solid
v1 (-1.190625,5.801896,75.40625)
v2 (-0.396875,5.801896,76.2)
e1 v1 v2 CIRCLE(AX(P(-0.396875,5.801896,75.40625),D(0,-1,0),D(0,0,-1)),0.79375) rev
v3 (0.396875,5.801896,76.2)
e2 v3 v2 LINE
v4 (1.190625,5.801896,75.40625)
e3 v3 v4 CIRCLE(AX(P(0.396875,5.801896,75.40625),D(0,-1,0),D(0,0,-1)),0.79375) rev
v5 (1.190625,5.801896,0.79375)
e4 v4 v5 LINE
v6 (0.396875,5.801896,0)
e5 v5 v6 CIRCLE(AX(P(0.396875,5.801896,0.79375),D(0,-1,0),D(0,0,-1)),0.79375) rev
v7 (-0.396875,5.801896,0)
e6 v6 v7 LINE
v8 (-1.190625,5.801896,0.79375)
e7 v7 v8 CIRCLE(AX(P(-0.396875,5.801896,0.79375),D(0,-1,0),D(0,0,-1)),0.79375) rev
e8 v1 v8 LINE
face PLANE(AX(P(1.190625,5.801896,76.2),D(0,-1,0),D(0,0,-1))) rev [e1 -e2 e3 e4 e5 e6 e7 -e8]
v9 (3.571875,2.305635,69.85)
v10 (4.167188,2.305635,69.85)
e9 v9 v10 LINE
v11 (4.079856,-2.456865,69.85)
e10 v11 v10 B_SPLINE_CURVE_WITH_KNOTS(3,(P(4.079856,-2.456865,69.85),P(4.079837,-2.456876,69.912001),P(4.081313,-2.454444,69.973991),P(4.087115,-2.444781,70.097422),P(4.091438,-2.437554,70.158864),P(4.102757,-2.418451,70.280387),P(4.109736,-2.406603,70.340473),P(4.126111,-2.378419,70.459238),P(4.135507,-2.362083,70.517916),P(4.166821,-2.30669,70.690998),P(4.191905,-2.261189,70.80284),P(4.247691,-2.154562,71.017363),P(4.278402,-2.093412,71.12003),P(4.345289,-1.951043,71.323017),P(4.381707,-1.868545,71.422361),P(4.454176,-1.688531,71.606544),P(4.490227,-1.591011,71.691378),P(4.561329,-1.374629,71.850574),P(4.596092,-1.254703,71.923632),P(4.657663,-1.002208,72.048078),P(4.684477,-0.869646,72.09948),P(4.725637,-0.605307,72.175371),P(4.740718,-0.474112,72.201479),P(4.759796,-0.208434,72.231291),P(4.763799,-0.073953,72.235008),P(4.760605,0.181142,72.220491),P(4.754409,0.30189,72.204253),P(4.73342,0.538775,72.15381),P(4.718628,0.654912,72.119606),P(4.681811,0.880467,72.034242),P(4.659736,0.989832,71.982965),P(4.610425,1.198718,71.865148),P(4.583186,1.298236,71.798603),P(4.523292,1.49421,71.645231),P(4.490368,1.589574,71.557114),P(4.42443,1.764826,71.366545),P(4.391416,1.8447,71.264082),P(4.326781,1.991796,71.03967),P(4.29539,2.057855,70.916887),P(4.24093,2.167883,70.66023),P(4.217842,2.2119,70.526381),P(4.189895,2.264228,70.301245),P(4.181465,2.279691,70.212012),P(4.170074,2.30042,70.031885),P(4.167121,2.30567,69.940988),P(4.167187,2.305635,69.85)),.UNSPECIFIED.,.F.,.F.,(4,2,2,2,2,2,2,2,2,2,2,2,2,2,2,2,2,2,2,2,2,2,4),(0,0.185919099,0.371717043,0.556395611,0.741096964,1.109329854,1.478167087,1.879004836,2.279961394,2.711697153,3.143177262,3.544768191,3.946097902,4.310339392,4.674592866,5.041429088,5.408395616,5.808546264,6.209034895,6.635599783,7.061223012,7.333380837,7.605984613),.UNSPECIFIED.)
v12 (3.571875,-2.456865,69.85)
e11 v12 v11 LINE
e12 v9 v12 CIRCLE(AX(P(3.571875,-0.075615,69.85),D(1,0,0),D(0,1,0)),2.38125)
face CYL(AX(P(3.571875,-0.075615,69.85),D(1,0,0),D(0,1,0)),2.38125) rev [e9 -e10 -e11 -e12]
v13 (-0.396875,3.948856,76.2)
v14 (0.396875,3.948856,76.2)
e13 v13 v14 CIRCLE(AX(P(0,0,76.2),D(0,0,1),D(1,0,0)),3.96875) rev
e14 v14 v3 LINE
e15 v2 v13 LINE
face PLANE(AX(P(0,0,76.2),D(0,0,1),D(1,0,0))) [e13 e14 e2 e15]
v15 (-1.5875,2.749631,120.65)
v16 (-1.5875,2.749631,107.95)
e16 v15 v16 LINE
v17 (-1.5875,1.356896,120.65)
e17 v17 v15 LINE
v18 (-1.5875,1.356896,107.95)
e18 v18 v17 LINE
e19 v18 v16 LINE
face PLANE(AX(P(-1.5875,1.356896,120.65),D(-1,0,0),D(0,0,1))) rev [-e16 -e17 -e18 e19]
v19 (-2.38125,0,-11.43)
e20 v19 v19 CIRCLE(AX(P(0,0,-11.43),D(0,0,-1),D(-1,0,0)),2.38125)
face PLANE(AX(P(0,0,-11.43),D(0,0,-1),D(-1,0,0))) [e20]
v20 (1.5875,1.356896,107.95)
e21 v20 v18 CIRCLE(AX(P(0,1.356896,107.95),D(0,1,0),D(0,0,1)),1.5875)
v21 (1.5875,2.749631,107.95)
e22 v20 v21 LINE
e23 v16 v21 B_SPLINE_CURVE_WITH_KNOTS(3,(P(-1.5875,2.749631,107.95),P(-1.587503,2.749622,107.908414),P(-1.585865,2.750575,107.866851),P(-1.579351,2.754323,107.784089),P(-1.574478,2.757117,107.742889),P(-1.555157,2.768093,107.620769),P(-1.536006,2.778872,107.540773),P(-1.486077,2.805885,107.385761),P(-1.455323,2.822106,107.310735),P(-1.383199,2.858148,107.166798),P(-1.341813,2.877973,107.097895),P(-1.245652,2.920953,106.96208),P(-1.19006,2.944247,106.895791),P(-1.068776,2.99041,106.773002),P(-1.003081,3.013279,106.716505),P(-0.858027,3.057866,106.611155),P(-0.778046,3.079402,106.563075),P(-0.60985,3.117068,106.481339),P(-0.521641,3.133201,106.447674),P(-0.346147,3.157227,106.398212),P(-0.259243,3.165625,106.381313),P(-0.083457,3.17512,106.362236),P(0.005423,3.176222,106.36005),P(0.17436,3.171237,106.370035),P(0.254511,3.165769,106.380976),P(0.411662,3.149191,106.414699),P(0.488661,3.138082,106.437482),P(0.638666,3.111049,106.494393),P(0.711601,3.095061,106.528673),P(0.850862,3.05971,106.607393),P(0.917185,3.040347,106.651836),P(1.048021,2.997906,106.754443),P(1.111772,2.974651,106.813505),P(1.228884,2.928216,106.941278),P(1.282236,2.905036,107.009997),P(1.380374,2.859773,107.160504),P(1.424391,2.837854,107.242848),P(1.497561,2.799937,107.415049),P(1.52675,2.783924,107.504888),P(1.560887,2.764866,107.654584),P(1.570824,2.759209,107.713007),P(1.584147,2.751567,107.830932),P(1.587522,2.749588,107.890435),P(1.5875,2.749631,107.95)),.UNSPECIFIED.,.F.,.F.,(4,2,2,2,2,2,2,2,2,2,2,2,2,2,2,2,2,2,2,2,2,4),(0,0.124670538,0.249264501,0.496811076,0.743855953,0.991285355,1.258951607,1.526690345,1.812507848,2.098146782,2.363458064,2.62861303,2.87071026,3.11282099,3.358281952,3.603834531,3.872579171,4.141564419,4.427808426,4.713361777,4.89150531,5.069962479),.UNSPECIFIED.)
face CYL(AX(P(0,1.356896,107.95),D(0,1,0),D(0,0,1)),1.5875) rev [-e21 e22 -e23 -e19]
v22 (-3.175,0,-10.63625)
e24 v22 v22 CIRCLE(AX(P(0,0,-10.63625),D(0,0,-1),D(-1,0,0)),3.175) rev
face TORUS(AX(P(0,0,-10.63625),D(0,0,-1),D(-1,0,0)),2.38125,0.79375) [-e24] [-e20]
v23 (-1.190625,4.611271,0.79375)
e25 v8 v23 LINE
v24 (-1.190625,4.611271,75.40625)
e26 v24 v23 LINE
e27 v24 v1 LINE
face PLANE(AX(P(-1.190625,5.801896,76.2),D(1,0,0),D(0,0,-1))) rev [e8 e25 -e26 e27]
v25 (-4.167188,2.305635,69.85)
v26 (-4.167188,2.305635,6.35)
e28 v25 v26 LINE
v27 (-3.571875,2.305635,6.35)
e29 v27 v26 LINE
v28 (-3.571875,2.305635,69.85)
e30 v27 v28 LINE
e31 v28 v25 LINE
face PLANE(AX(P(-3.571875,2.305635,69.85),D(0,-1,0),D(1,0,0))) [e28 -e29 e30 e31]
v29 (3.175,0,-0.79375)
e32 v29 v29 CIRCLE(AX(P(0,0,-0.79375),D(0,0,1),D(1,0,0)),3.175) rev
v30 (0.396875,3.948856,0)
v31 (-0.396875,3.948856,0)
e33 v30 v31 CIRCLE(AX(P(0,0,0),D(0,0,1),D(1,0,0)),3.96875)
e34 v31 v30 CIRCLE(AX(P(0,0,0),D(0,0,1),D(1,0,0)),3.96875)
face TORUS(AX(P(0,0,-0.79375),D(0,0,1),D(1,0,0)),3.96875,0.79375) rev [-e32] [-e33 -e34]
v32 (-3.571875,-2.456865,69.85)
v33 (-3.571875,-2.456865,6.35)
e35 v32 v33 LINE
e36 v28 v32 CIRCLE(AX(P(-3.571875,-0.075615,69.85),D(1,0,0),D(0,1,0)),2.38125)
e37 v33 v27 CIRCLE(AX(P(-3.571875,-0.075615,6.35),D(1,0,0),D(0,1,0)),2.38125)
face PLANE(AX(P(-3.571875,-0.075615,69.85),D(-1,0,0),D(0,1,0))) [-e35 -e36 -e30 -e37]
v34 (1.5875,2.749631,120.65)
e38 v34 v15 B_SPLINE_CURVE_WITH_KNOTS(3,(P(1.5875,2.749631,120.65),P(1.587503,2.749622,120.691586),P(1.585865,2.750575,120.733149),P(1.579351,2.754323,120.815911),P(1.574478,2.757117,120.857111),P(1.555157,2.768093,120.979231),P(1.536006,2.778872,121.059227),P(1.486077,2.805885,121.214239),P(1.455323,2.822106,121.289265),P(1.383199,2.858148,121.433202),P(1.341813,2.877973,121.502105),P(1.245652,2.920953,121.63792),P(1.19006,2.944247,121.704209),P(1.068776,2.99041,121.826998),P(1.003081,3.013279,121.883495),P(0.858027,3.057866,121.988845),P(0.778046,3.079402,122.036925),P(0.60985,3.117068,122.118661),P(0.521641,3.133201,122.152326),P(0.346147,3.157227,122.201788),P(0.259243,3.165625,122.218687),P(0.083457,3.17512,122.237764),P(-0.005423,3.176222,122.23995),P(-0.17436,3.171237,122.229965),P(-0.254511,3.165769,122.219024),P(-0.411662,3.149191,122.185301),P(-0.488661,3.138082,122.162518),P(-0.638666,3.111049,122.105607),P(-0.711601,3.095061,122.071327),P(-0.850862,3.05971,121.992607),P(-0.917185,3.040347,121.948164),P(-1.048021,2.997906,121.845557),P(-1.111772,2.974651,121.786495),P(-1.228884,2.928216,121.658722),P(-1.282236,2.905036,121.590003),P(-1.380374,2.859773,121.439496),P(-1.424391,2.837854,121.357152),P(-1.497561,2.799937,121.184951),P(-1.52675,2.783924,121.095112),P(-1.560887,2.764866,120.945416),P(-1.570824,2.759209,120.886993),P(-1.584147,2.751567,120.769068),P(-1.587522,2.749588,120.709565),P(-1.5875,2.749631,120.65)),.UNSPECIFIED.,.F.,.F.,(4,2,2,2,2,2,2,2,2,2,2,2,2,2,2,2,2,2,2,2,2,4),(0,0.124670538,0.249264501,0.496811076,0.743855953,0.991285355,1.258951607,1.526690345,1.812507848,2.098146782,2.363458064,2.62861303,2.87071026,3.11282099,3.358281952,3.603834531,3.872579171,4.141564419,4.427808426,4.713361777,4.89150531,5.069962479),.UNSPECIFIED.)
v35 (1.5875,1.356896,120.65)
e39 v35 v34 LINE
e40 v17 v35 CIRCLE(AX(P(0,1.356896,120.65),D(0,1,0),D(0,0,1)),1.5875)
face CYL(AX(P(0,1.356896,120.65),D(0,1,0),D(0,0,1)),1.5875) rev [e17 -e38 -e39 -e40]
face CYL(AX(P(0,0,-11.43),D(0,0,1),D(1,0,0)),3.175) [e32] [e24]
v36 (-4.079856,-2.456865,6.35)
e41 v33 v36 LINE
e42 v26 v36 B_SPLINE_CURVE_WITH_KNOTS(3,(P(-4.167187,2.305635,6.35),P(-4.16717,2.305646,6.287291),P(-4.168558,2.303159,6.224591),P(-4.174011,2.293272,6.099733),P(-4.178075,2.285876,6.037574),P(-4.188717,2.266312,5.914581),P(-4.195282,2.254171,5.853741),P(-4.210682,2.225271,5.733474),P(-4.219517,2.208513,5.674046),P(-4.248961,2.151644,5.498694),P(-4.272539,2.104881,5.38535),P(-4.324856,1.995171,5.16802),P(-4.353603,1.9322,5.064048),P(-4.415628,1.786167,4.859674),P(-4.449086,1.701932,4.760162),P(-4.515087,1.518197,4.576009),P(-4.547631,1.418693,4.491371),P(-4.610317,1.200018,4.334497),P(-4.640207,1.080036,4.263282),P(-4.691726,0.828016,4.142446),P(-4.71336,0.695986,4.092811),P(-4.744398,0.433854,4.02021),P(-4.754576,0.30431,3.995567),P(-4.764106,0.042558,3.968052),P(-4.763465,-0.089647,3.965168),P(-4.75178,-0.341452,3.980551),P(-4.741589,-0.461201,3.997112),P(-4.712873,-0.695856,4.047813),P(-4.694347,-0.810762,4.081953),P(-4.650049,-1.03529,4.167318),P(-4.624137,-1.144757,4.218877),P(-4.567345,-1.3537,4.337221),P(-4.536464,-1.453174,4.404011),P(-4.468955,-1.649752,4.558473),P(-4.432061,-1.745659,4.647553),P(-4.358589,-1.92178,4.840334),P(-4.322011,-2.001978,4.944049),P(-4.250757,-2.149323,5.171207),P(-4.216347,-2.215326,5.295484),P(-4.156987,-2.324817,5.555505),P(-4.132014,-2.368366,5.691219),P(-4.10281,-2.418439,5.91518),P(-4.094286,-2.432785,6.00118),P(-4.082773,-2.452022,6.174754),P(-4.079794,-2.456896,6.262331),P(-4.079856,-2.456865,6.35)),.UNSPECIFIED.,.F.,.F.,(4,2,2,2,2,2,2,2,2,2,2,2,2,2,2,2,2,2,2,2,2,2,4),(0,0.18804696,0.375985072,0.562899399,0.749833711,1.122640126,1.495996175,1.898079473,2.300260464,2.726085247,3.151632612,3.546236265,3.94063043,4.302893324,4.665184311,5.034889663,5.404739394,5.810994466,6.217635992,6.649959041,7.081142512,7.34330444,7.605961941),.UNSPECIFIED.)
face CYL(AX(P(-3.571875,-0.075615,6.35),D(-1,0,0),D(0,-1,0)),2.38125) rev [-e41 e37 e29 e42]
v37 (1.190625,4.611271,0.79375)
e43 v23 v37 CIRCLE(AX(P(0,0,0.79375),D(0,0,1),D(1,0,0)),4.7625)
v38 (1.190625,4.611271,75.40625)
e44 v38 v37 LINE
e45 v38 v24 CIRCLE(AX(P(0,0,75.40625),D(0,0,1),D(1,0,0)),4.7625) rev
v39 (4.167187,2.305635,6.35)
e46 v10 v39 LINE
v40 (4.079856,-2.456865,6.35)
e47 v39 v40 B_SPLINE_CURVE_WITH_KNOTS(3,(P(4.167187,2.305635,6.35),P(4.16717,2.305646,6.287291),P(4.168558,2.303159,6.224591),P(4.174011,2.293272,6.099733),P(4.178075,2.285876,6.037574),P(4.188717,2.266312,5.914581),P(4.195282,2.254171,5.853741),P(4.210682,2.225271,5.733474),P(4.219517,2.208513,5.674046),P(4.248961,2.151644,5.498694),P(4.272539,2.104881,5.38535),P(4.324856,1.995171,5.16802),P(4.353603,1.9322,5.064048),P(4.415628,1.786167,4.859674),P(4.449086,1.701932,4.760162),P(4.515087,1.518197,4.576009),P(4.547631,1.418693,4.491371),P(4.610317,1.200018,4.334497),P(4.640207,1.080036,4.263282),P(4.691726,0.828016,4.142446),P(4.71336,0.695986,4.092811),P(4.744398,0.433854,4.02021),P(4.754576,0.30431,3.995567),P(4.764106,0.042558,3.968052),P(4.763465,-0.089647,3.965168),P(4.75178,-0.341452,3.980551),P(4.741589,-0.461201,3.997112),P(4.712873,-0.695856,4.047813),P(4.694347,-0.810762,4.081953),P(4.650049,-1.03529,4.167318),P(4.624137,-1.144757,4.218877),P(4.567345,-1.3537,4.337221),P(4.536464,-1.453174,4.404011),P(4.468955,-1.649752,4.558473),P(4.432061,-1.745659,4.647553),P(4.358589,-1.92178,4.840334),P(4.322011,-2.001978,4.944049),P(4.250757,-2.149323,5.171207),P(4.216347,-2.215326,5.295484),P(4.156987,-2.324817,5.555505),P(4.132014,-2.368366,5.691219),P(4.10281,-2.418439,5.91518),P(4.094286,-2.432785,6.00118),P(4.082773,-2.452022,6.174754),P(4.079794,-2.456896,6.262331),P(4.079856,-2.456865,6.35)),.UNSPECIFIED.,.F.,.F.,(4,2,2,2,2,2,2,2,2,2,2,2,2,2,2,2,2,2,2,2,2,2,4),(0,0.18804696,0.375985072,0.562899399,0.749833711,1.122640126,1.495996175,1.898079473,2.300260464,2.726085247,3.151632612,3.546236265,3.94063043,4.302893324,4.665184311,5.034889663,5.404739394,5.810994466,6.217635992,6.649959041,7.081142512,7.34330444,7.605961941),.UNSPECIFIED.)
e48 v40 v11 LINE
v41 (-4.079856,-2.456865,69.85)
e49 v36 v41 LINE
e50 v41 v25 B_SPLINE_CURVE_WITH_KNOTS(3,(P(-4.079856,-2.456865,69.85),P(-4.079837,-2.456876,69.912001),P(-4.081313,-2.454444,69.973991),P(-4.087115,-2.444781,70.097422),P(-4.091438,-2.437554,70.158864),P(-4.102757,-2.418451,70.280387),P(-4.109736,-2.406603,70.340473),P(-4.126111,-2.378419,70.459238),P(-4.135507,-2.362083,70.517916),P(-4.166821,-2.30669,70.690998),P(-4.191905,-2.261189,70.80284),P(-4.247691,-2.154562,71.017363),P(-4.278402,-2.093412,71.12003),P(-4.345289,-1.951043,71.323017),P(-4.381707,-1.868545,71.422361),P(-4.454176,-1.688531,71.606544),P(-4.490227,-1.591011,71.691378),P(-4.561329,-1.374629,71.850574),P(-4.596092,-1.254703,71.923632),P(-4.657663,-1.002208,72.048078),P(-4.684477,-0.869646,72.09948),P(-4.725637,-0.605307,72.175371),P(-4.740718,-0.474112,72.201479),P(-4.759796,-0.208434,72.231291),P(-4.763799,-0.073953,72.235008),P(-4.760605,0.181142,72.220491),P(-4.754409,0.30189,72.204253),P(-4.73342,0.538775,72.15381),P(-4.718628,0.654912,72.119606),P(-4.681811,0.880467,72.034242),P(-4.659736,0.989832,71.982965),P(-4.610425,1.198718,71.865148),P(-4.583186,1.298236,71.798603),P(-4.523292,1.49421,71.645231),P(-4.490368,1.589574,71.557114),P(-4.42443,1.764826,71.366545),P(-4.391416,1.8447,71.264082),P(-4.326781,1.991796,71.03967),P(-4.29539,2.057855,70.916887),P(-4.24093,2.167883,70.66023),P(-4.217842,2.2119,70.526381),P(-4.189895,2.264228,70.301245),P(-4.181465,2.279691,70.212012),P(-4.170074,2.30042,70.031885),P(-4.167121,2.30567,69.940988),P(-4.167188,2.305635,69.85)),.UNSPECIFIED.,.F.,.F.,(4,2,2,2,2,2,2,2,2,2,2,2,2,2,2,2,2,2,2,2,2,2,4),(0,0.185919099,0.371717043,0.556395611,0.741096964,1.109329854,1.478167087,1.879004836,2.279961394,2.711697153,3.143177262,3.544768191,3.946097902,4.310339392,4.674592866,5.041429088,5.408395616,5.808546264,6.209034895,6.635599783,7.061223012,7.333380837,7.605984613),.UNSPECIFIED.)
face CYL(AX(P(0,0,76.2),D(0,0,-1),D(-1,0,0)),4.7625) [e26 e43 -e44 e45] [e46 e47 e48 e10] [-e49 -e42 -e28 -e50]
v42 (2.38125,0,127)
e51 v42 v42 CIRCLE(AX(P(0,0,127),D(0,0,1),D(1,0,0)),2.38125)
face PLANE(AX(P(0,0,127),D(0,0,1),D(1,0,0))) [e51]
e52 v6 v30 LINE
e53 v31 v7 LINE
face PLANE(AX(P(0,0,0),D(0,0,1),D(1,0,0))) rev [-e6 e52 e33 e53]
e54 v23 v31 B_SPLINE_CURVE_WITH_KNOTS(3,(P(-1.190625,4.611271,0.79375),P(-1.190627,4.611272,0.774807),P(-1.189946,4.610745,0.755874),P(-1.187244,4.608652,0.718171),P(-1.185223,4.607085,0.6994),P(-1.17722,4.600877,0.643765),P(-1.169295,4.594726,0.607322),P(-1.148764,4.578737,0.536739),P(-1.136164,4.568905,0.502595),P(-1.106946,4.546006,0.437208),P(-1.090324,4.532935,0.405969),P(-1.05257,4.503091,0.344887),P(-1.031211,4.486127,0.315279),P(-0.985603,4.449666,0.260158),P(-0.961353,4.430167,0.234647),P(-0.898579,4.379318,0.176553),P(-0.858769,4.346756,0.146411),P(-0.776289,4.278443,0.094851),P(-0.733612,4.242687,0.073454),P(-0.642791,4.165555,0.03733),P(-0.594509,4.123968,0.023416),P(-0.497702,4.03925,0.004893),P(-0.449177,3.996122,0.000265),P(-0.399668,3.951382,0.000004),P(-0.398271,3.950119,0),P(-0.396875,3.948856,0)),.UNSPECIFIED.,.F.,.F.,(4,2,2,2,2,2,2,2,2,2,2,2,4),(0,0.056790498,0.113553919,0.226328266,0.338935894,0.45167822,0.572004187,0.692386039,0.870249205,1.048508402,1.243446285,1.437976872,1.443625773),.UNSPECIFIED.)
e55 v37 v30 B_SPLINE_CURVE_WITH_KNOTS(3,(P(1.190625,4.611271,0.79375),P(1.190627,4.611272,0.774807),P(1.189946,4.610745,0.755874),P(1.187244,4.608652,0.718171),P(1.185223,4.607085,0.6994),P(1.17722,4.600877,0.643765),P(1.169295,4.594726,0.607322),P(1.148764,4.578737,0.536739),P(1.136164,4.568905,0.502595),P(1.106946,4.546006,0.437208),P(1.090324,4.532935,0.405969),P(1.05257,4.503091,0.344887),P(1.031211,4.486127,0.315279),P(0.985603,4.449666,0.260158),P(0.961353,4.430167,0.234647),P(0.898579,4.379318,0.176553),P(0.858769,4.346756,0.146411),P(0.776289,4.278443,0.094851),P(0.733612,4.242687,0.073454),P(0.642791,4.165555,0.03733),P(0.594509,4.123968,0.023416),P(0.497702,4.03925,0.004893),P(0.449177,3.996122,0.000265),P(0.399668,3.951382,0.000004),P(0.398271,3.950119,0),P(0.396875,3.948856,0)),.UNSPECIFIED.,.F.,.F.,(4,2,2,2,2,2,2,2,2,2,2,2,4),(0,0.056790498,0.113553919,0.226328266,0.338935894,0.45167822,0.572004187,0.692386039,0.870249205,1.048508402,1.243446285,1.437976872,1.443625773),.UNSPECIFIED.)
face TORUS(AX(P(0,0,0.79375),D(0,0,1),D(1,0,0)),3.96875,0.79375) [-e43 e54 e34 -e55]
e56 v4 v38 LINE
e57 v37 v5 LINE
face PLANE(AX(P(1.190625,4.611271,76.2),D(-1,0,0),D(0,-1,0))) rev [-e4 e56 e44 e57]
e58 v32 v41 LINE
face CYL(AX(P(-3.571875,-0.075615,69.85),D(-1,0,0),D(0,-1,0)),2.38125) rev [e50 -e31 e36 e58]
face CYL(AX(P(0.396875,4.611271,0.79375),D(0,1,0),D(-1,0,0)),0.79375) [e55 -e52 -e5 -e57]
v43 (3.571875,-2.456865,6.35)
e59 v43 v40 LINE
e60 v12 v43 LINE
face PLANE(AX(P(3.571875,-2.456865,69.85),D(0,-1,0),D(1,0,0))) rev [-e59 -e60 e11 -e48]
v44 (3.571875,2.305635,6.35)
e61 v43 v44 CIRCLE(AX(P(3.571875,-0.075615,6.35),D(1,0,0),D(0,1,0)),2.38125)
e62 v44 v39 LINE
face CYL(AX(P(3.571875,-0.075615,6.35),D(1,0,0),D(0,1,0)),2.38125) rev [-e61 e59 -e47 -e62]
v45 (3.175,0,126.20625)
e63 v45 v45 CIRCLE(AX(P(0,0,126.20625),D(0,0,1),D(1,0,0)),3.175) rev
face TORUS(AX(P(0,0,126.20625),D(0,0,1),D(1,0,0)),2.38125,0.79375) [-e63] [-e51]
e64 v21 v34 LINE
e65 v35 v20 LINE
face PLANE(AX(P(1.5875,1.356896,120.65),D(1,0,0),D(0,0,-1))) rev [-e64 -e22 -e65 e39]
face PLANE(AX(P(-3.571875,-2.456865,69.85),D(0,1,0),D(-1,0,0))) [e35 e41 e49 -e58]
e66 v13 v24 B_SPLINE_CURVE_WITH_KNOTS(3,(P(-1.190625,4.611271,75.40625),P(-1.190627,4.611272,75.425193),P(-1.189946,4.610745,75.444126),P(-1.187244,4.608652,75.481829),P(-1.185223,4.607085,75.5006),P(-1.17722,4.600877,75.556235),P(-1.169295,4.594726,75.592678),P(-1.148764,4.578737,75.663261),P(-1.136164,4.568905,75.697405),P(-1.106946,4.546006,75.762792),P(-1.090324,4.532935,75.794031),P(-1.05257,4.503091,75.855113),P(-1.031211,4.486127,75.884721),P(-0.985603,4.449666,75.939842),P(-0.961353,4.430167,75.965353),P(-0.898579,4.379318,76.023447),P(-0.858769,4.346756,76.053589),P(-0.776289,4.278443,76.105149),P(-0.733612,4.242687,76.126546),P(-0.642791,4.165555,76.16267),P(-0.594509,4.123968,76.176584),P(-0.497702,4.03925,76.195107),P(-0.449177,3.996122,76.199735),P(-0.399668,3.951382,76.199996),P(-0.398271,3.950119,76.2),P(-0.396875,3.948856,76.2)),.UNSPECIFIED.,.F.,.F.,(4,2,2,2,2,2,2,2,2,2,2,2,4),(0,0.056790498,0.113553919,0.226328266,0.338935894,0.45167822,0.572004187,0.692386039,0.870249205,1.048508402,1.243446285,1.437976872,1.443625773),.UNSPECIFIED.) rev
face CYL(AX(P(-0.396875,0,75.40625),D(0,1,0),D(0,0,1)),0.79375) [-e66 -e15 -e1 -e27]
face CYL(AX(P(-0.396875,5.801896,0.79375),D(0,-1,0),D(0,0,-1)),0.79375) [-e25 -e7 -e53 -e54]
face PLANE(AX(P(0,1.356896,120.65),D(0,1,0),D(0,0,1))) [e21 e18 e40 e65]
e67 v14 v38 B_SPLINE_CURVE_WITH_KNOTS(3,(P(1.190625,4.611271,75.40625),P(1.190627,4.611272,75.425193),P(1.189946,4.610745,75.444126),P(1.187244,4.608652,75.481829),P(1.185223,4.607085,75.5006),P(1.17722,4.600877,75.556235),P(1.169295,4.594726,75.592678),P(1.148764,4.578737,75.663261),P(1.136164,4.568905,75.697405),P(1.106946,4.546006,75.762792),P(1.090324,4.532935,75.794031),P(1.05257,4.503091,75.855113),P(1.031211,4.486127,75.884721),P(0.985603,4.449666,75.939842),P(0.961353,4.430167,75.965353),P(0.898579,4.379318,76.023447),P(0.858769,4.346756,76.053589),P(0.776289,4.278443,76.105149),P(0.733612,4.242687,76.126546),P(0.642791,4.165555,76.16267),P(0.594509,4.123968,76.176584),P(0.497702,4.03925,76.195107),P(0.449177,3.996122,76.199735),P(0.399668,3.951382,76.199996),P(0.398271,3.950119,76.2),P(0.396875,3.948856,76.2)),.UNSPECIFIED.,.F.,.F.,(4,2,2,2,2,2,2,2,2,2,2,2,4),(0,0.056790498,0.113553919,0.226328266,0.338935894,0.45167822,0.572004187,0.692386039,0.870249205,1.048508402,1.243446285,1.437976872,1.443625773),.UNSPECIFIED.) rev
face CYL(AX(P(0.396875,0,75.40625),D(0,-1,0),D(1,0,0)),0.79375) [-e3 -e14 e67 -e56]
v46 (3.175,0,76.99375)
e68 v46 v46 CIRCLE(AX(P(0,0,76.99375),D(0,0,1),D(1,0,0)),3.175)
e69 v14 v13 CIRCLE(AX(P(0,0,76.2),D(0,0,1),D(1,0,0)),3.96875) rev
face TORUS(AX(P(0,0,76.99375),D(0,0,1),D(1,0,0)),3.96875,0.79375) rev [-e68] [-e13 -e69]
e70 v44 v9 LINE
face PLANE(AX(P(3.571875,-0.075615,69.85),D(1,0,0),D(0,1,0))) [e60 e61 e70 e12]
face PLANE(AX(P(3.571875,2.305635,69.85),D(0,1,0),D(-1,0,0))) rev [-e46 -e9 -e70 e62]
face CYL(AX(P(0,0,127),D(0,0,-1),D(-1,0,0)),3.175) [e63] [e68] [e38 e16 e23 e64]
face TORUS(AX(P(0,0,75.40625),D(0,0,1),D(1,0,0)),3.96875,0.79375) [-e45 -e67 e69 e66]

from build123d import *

# Parameters (mm, degrees)
BOSS_EXTRUDE1_DEPTH = 76.2
SKETCH2_R           = 3.175
BOSS_EXTRUDE2_DEPTH = 11.43
BOSS_EXTRUDE3_START = 50.8
SKETCH3_R           = 3.175
BOSS_EXTRUDE3_DEPTH = 50.8
FILLET1_R           = 0.79375
CUT_EXTRUDE1_DEPTH  = 1.190625
CUT_EXTRUDE2_DEPTH  = 4.445


with BuildPart() as part:
    # Sketch1 → Boss-Extrude1 (new body)
    with BuildSketch(Plane.XY):
        with BuildLine():
            Line((1.190625, 4.611270797), (1.190625, 5.801895797))
            Line((1.190625, 5.801895797), (-1.190625, 5.801895797))
            Line((-1.190625, 5.801895797), (-1.190625, 4.611270797))
            ThreePointArc((-1.190625, 4.611270797), (0, -4.7625), (1.190625, 4.611270797))
        make_face()
    extrude(amount=BOSS_EXTRUDE1_DEPTH)

    # Sketch2 → Boss-Extrude2 (add)
    with BuildSketch(Plane(origin=(0, 0, 0), x_dir=(-1, 0, 0), z_dir=(0, 0, -1))):
        Circle(SKETCH2_R)
    extrude(amount=BOSS_EXTRUDE2_DEPTH)

    # Sketch3 → Boss-Extrude3 (add)
    with BuildSketch(Plane.XY.offset(76.2).offset(BOSS_EXTRUDE3_START)):
        with Locations(Location((0, 0, 0), (0, 0, 180))):
            Circle(SKETCH3_R)
    extrude(amount=-BOSS_EXTRUDE3_DEPTH)

    # Fillet1
    fillet1_edges = [part.edges().sort_by_distance(p)[0] for p in [
        (3.175, 0, 0),
        (3.175, 0, -11.43),
        (-1.190625, 5.206583297, 76.2),
        (3.175, 0, 76.2),
        (3.175, 0, 127),
        (0, -4.7625, 76.2),
        (-1.190625, 5.206583297, 0),
        (1.190625, 5.206583297, 0),
        (0, -4.7625, 0),
        (1.190625, 5.206583297, 76.2),
    ]]
    fillet(fillet1_edges, radius=FILLET1_R - 0.0001)  # a hair under: the kernel refuses the full size

    # Sketch4 → Cut-Extrude1 (cut)
    with BuildSketch(Plane(origin=(4.7625, 0, 0), x_dir=(0, 0, -1), z_dir=(1, 0, 0))):
        with BuildLine():
            Line((-69.85, 2.305635398), (-6.35, 2.305635398))
            ThreePointArc((-6.35, 2.305635398), (-3.96875, -0.075614602), (-6.35, -2.456864602))
            Line((-6.35, -2.456864602), (-69.85, -2.456864602))
            ThreePointArc((-69.85, -2.456864602), (-72.23125, -0.075614602), (-69.85, 2.305635398))
        make_face()
    cut_extrude1 = extrude(amount=-CUT_EXTRUDE1_DEPTH, mode=Mode.SUBTRACT)

    # Sketch5 → Cut-Extrude2 (cut)
    with BuildSketch(Plane(origin=(0, 5.801895797, 0), x_dir=(1, 0, 0), z_dir=(0, 1, 0))):
        with BuildLine():
            Line((-1.5875, -120.65), (-1.5875, -107.95))
            ThreePointArc((-1.5875, -107.95), (0, -106.3625), (1.5875, -107.95))
            Line((1.5875, -107.95), (1.5875, -120.65))
            ThreePointArc((1.5875, -120.65), (0, -122.2375), (-1.5875, -120.65))
        make_face()
    extrude(amount=-CUT_EXTRUDE2_DEPTH, mode=Mode.SUBTRACT)

    # Mirror1: Cut-Extrude1 across plane
    add(cut_extrude1.mirror(Plane(origin=(0, 0, 0), x_dir=(0, 0, 1), z_dir=(1, 0, 0))), mode=Mode.SUBTRACT)


solid = part.part
